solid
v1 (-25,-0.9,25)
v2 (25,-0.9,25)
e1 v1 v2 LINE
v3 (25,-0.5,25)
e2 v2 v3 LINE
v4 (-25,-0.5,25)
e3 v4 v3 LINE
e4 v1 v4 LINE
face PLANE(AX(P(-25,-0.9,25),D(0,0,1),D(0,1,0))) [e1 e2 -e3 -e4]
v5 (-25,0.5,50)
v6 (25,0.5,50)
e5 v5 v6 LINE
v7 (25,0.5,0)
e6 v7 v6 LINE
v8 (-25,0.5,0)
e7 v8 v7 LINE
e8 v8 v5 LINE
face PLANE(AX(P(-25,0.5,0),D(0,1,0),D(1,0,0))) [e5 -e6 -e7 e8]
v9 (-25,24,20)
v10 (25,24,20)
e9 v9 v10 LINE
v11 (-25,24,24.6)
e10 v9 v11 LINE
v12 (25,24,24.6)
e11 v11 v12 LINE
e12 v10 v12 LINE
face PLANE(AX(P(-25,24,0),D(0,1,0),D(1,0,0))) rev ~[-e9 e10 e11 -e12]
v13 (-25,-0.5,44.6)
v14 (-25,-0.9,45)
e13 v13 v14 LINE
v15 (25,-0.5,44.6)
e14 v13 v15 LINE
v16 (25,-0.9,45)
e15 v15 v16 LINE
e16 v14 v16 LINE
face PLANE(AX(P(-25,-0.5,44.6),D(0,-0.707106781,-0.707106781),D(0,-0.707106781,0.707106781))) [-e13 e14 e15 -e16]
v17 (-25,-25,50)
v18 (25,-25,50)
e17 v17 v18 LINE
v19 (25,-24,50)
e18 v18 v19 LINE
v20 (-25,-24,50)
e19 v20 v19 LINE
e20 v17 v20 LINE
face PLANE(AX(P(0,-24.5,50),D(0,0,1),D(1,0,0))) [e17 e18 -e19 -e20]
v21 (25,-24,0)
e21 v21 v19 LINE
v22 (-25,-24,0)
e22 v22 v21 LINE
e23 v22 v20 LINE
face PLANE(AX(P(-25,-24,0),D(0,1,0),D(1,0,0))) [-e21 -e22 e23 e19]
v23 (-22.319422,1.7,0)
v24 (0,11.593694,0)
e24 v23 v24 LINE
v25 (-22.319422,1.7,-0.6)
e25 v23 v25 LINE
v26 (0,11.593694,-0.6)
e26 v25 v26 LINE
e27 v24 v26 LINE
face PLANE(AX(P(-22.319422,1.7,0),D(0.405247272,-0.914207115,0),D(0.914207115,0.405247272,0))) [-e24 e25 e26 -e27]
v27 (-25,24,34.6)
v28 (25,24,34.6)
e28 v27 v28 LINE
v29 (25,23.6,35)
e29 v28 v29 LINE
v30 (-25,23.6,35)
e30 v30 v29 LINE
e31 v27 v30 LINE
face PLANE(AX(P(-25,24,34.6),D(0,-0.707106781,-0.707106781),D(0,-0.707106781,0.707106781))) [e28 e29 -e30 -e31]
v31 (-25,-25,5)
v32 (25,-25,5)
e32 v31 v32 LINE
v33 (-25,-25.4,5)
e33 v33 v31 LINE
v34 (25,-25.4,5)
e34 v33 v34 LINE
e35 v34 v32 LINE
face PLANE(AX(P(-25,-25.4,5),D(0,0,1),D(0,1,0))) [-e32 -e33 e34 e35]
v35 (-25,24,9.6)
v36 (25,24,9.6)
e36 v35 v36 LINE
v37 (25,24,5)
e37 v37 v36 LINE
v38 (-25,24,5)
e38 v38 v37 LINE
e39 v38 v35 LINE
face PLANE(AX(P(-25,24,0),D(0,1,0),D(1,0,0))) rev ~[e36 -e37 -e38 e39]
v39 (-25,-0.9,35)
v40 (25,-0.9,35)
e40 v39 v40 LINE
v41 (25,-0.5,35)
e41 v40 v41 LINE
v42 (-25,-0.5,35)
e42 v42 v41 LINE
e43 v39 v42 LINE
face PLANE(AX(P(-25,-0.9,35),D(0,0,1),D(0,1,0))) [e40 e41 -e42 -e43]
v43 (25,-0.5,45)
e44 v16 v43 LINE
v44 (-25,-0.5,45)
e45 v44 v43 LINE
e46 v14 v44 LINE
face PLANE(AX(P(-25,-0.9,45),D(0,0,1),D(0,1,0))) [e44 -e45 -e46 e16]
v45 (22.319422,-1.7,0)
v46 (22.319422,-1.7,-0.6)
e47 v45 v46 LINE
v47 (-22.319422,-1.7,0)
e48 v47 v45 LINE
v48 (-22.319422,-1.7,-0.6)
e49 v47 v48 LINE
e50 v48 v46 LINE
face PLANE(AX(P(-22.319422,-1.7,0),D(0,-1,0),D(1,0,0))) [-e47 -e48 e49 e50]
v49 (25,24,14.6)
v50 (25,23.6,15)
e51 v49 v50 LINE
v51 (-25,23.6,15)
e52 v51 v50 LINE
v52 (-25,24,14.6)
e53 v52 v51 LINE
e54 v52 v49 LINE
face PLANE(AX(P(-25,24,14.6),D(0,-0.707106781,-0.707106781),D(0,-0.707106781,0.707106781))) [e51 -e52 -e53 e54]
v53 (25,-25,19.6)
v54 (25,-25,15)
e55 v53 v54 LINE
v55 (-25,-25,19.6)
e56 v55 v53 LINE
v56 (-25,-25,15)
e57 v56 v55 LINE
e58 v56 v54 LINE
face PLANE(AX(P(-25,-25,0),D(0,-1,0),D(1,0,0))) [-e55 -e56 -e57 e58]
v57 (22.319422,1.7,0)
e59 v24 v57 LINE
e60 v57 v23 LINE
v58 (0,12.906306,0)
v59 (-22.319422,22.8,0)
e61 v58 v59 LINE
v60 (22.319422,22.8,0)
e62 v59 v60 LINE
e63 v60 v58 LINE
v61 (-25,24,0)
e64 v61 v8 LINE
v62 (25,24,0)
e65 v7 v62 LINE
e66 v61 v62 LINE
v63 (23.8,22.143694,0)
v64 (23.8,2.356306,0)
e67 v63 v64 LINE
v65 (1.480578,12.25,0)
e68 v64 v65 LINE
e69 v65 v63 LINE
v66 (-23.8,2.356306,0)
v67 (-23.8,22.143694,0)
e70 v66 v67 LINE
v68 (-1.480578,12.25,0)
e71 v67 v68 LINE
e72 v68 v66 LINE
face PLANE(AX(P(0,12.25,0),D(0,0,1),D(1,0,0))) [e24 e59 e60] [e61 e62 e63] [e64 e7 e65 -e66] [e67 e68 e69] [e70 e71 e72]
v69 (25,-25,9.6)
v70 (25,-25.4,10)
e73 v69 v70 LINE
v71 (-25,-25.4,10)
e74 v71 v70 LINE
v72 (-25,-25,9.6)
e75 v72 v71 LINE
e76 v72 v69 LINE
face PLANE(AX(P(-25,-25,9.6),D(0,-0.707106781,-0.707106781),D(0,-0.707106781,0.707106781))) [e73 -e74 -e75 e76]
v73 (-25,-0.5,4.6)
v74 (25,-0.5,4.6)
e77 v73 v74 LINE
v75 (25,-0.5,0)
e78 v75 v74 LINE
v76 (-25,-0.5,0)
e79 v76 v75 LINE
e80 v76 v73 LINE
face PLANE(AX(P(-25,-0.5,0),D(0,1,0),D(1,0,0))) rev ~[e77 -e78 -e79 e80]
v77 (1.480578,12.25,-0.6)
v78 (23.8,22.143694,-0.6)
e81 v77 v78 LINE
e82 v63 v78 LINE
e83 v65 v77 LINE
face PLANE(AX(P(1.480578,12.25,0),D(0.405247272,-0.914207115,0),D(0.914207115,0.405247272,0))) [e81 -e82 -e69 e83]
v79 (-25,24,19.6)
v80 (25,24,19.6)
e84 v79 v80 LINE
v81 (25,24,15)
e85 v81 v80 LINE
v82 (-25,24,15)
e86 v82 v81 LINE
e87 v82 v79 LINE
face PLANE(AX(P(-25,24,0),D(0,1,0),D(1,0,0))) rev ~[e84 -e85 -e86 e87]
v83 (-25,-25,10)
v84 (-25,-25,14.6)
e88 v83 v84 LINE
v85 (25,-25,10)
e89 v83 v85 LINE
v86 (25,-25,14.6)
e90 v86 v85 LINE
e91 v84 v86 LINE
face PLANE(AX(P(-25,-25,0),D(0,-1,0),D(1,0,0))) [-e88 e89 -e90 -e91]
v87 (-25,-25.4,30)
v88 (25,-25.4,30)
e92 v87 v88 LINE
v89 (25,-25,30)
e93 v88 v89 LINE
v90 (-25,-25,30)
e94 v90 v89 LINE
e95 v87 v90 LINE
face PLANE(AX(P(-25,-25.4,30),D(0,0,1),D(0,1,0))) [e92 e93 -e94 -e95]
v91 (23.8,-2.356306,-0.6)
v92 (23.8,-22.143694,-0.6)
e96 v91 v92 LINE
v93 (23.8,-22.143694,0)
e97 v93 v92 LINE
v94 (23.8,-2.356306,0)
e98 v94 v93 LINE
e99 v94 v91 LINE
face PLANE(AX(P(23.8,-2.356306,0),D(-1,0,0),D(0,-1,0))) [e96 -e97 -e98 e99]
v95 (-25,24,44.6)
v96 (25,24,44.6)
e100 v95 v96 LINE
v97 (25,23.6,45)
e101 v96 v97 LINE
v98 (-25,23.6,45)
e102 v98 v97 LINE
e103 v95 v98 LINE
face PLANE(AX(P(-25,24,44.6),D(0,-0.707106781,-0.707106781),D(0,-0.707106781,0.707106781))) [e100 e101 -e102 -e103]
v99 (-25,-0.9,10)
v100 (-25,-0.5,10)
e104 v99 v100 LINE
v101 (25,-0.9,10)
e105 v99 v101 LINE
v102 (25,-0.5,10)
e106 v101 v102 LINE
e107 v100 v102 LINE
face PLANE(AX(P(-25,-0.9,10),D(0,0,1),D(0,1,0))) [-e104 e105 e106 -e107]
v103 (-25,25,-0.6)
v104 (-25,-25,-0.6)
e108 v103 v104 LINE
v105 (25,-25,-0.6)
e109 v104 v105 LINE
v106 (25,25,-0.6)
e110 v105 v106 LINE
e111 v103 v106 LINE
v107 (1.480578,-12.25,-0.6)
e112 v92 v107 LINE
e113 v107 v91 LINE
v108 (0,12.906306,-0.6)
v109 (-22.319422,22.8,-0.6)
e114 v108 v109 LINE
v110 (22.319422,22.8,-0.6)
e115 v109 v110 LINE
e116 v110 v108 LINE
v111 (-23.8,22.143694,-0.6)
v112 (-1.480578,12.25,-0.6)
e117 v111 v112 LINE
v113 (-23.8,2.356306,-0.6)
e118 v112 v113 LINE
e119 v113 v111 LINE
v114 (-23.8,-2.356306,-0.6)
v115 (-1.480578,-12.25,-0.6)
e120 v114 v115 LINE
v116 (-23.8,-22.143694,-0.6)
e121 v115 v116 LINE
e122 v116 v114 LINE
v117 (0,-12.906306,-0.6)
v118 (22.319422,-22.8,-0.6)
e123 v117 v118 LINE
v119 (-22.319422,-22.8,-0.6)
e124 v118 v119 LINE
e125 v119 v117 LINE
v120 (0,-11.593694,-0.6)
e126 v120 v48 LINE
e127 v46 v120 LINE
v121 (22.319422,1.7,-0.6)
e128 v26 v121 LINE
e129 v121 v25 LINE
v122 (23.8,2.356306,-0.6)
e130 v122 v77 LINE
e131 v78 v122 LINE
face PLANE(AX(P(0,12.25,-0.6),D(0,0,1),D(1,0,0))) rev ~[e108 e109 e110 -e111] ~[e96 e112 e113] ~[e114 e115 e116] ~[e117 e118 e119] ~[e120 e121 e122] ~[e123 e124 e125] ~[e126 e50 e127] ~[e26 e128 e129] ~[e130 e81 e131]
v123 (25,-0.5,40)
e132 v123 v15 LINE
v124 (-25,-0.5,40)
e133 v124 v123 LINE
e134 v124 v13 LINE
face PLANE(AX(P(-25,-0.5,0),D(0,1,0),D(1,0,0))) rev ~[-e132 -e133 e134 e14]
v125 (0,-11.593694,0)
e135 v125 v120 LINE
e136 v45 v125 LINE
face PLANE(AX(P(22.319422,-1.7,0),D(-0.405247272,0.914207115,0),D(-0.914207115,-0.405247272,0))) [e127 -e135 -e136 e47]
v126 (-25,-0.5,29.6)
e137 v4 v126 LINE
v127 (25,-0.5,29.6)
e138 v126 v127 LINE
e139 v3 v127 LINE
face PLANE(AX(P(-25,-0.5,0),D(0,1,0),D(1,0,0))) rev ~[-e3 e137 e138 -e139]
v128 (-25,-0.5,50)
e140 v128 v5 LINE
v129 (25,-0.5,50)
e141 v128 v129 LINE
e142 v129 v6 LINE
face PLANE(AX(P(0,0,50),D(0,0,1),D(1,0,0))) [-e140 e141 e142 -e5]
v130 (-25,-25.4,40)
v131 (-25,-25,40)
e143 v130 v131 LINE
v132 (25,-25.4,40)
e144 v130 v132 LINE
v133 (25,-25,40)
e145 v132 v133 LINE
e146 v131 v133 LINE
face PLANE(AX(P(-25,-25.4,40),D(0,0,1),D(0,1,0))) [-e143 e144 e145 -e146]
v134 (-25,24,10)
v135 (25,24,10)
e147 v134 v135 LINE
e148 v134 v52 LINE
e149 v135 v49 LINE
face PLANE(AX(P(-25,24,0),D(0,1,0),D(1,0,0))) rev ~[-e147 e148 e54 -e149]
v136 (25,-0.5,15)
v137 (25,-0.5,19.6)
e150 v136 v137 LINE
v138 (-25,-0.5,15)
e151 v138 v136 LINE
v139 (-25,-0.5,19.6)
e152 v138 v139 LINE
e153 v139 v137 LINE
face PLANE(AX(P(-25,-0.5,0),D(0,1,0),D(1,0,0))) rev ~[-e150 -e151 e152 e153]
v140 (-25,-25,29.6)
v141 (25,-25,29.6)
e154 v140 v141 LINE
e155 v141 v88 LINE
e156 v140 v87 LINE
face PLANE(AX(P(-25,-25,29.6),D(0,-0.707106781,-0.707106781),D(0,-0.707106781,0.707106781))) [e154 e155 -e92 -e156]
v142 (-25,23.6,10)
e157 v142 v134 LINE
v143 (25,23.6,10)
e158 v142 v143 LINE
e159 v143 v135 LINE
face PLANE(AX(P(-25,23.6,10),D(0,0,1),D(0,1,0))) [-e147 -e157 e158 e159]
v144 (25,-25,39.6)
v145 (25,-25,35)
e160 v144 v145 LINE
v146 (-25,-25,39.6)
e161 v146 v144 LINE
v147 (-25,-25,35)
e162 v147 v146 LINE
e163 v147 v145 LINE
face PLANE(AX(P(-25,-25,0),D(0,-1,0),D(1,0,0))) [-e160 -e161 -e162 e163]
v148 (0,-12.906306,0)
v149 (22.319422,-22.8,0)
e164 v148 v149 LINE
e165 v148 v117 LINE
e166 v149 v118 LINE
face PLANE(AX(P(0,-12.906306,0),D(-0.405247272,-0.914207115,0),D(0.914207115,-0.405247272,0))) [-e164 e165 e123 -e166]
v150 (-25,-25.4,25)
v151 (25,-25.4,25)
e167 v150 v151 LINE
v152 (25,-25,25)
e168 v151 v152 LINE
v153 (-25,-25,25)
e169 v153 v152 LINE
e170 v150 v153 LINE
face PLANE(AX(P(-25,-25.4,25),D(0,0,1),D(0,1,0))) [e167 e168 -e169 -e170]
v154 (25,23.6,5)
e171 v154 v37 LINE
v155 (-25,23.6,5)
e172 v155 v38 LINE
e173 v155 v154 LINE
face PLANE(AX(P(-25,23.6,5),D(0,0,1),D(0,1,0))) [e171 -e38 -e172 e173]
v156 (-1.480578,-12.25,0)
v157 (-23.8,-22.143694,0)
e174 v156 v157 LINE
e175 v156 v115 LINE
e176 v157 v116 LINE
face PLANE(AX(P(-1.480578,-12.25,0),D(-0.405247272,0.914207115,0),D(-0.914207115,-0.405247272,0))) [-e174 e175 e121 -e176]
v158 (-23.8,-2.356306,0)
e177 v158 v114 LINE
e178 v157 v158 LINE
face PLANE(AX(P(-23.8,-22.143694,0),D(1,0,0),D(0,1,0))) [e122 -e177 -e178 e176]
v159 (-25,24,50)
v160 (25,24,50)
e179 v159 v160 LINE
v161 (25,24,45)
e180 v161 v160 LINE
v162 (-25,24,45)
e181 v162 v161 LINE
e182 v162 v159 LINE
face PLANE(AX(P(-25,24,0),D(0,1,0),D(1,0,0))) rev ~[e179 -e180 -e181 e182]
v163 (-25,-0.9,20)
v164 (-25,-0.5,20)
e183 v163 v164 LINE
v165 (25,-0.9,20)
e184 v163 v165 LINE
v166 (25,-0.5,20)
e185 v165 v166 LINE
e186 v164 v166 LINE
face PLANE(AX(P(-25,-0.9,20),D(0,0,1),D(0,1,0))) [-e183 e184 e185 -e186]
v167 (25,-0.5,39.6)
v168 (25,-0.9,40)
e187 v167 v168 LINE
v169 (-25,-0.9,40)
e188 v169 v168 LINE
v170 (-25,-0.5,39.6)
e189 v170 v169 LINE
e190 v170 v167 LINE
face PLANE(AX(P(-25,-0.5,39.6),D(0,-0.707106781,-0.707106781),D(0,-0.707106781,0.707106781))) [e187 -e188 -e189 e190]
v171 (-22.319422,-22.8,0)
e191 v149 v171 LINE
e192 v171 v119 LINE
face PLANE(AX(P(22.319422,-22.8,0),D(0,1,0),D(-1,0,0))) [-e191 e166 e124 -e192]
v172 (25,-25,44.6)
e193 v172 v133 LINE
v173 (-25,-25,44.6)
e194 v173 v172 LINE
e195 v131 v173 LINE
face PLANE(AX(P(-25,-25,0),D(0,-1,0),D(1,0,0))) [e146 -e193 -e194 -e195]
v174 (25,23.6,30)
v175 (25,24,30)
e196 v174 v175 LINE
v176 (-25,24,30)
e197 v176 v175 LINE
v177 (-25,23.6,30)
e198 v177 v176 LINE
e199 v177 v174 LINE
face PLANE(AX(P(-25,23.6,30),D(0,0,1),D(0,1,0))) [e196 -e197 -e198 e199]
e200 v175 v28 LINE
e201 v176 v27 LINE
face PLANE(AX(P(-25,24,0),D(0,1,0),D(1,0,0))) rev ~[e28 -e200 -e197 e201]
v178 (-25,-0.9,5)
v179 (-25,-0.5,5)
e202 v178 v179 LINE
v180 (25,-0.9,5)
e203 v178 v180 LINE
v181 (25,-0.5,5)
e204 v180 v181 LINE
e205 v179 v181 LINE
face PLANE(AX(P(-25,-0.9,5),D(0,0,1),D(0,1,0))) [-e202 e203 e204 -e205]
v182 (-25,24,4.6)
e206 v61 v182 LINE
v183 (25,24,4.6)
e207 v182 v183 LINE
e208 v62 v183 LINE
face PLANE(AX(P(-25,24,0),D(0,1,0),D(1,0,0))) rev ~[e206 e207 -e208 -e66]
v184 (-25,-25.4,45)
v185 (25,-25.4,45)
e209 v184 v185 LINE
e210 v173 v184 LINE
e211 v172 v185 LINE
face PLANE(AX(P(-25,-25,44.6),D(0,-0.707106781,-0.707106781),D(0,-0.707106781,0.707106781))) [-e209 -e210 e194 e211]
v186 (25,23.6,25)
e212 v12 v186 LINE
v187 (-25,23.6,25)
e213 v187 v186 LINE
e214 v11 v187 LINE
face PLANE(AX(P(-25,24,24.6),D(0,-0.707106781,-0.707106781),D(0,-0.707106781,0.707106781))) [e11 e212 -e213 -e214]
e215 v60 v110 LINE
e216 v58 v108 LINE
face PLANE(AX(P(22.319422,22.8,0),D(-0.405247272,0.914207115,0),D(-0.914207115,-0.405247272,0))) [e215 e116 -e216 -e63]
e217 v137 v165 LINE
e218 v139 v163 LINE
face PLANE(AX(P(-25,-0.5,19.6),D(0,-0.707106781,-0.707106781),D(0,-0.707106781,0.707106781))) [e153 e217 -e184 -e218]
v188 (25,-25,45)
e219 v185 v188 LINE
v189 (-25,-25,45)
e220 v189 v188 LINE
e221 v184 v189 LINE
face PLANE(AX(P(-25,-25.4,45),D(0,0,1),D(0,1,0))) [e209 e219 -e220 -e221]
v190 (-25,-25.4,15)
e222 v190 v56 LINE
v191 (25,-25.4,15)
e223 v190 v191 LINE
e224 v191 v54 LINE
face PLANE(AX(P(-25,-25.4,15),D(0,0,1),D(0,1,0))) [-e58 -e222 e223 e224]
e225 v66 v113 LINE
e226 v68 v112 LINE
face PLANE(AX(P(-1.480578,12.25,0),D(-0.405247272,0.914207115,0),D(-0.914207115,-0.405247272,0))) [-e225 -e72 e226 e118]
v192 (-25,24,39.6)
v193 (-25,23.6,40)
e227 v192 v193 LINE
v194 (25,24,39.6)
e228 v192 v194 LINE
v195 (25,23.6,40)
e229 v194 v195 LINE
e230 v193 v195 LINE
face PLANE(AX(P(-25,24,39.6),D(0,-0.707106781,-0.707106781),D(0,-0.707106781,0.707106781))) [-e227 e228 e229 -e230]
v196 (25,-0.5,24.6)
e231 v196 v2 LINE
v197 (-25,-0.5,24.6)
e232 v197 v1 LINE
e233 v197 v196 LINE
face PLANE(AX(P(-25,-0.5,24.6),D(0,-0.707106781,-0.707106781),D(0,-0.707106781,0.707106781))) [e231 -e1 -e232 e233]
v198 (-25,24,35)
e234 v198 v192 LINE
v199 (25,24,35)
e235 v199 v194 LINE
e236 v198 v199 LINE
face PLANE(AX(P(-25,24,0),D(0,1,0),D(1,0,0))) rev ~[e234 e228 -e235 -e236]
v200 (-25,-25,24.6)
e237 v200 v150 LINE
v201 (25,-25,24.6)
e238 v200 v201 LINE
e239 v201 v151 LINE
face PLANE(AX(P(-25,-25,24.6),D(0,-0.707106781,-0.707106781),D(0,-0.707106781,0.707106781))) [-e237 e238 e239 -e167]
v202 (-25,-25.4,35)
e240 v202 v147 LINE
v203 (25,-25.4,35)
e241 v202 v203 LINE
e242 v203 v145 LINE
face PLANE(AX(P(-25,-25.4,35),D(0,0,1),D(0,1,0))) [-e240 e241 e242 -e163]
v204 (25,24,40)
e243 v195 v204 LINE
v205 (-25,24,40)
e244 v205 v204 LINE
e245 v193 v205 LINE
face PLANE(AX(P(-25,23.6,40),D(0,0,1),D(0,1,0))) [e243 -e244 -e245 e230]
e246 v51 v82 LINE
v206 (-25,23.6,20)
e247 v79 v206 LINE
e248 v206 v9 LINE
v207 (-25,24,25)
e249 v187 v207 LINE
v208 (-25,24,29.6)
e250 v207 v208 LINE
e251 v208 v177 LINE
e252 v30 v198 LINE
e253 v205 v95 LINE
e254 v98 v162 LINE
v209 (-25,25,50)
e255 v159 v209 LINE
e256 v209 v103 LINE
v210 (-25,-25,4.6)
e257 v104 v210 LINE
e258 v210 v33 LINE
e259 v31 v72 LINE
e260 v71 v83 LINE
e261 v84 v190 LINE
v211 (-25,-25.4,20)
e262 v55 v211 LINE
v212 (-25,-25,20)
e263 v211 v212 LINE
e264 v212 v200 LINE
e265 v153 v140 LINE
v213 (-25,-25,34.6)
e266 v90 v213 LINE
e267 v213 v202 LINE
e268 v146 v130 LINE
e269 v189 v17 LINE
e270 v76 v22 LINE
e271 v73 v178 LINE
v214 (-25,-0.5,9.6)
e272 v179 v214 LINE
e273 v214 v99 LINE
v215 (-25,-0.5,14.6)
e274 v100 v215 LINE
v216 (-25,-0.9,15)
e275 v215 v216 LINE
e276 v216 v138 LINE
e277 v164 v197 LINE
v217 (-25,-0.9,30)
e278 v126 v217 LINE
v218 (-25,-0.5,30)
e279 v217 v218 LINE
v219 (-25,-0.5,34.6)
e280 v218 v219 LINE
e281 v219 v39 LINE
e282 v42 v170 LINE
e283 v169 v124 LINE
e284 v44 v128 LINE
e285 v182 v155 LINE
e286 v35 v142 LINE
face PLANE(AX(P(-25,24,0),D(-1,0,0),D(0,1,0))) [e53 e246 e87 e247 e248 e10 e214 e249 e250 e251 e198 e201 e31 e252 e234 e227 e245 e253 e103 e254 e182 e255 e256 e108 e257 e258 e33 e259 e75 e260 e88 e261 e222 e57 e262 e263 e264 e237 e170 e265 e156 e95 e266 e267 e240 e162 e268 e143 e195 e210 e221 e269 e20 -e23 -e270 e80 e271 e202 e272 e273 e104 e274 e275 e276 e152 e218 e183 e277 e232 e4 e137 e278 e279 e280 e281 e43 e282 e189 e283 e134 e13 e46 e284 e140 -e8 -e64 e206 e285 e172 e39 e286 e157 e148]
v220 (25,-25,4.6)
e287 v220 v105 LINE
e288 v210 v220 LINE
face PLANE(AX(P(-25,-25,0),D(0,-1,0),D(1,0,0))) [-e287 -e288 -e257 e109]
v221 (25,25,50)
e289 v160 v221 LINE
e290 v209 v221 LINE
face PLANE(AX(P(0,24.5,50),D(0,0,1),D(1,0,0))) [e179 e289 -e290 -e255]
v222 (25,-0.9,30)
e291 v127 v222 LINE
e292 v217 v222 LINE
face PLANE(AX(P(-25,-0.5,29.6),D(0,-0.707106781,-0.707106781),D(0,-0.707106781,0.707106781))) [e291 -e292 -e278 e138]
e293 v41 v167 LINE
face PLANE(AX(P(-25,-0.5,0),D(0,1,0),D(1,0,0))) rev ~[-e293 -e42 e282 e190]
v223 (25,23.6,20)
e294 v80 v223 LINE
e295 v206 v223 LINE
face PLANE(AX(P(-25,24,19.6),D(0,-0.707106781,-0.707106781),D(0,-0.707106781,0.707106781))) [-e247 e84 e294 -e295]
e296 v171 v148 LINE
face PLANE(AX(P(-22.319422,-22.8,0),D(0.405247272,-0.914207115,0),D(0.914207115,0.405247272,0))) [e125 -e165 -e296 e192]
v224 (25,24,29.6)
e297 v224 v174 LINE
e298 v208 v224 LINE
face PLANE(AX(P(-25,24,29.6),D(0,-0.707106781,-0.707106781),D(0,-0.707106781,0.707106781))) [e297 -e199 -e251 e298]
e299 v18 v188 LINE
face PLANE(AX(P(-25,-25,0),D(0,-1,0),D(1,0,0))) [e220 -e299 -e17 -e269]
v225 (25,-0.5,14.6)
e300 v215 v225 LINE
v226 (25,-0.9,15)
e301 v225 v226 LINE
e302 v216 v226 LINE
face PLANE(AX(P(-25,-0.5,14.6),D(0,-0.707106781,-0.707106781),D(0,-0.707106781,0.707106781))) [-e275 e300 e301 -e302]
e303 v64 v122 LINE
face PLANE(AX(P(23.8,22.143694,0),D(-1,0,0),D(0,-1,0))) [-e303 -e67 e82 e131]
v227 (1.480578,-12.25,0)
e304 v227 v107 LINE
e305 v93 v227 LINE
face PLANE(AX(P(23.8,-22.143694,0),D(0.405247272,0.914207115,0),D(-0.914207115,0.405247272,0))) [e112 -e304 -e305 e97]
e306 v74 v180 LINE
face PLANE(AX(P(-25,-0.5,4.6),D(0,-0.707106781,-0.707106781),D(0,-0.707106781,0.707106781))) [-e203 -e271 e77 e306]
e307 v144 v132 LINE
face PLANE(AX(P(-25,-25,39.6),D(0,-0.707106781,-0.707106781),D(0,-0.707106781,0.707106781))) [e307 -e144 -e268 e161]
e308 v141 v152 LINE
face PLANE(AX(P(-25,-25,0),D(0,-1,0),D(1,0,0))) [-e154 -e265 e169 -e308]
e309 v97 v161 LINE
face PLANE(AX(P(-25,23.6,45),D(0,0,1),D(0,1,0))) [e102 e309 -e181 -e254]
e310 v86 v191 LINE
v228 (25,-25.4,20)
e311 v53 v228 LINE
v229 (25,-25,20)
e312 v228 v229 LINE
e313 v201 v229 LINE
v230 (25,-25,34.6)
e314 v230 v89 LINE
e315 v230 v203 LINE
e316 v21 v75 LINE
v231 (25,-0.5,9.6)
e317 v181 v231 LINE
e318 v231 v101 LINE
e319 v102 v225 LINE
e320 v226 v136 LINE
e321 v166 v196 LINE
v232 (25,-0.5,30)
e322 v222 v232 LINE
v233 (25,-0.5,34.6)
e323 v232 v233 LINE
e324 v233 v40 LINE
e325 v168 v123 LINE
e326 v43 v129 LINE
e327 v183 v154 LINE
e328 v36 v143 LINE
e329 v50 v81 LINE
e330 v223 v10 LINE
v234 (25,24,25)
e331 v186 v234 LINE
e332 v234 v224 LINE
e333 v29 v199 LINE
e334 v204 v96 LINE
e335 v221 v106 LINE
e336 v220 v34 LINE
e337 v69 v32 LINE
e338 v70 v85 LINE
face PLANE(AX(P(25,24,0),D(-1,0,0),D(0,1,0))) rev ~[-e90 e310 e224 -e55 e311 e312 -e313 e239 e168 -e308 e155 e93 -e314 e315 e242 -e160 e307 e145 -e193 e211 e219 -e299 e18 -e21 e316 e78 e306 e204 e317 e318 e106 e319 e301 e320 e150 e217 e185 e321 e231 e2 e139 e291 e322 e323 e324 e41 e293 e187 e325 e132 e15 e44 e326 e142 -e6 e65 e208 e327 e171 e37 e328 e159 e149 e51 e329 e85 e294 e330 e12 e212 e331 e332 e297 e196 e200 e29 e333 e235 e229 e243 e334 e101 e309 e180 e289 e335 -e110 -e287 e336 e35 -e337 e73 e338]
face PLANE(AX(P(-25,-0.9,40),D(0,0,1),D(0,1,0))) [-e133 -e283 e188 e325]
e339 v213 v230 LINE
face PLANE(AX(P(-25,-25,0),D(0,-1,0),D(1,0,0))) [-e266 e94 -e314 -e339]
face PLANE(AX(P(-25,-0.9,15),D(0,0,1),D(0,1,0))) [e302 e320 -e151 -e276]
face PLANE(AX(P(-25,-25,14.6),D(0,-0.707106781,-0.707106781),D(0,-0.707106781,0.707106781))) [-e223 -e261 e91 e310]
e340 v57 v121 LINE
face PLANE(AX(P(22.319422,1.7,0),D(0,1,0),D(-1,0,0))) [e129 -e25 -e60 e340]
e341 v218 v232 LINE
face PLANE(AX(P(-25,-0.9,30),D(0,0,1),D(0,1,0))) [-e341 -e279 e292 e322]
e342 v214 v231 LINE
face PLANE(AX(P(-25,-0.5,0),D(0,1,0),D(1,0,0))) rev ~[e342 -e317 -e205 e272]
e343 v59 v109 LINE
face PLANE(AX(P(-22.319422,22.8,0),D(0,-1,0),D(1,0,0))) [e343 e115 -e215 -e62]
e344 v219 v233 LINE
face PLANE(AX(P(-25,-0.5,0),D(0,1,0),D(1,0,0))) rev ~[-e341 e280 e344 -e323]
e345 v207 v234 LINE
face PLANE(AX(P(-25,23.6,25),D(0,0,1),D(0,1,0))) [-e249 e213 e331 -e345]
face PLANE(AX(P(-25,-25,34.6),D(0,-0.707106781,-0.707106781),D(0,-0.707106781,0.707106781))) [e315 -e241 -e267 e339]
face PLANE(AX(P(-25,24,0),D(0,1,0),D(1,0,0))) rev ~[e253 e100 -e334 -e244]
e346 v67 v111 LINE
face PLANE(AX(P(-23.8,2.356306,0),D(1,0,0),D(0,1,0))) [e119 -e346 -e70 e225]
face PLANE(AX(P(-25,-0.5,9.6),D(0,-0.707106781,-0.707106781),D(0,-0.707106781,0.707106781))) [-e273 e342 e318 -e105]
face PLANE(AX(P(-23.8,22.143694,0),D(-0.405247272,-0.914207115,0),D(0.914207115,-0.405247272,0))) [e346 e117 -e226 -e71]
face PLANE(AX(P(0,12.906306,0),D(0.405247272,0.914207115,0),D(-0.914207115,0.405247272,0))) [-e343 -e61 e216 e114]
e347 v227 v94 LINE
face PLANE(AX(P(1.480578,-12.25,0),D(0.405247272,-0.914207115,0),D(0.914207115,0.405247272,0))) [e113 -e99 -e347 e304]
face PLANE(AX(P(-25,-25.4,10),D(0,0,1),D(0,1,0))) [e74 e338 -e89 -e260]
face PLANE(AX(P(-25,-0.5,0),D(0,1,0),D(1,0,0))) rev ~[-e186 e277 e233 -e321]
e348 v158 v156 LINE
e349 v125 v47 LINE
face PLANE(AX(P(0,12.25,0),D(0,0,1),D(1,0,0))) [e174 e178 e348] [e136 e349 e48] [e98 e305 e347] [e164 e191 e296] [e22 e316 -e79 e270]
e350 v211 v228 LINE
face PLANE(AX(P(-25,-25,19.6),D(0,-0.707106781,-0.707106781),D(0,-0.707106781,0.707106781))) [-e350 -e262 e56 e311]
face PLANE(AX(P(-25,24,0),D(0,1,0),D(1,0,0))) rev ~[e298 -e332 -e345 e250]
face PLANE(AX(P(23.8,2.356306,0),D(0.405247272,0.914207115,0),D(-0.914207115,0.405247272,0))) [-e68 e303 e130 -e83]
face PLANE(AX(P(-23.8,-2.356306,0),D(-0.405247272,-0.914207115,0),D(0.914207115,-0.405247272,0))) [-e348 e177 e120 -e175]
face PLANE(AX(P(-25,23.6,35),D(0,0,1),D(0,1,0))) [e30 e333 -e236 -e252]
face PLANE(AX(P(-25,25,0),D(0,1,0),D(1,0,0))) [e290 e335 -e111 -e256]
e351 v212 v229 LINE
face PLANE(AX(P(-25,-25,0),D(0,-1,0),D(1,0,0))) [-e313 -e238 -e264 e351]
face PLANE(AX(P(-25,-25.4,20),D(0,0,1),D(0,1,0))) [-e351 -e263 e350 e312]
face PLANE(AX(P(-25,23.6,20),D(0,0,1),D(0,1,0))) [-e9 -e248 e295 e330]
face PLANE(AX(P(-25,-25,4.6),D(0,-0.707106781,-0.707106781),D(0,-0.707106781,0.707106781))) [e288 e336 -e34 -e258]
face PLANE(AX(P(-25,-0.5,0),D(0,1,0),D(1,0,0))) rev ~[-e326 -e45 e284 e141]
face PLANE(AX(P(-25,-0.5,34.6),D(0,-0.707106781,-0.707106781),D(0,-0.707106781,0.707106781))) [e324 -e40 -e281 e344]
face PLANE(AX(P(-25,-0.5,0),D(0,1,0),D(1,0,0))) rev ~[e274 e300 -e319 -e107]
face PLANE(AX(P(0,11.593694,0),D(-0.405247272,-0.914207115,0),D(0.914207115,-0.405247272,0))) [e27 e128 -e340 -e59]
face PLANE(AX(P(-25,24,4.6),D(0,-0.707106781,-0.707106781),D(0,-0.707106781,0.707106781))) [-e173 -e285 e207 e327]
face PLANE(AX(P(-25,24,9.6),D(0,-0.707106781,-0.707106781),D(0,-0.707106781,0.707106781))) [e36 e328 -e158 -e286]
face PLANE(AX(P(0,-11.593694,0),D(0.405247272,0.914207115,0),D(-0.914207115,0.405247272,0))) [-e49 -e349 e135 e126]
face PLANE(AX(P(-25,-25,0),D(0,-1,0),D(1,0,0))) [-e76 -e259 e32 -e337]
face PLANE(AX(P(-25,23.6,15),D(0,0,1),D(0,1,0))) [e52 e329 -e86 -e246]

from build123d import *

# Parameters (mm, degrees)
F0_W     = 50
F0_H     = 23.5
F0_H_2   = 1
F1_DEPTH = 0.6
F2_DEPTH = 50
F4_DEPTH = 50


# Not quite as in the source:
# - a feature names something its author has since deleted; it is built from what else it names


with BuildPart() as f1:
    # F0 (on Top) → F1 (new body)
    with BuildSketch(Plane.XY):
        with Locations((0, 12.25)):
            Rectangle(F0_W, F0_H)
        Polygon((-23.8, 22.1436935786), (-23.8, 22.8), (-22.3194224806, 22.8), (22.3194224806, 22.8), (23.8, 22.8), (23.8, 22.1436935786), (23.8, 2.3563064214), (23.8, 1.7), (22.3194224806, 1.7), (-22.3194224806, 1.7), (-23.8, 1.7), (-23.8, 2.3563064214), align=None, mode=Mode.SUBTRACT)
        with Locations((0, -12.25)):
            Rectangle(F0_W, F0_H)
        Polygon((-22.3194224806, -22.8), (-23.8, -22.8), (-23.8, -22.1436935786), (-23.8, -2.3563064214), (-23.8, -1.7), (-22.3194224806, -1.7), (22.3194224806, -1.7), (23.8, -1.7), (23.8, -2.3563064214), (23.8, -22.1436935786), (23.8, -22.8), (22.3194224806, -22.8), align=None, mode=Mode.SUBTRACT)
        with Locations((0, -24.5)):
            Rectangle(F0_W, F0_H_2)
        Rectangle(F0_W, F0_H_2)
        with Locations((0, 24.5)):
            Rectangle(F0_W, F0_H_2)
        Polygon((-22.3194224806, 22.8), (-23.8, 22.8), (-23.8, 22.1436935786), (-1.4805775194, 12.25), (0, 12.9063064214), align=None)
        Polygon((23.8, 22.8), (22.3194224806, 22.8), (0, 12.9063064214), (1.4805775194, 12.25), (23.8, 22.1436935786), align=None)
        Polygon((1.4805775194, 12.25), (0, 12.9063064214), (-1.4805775194, 12.25), (0, 11.5936935786), align=None)
        Polygon((23.8, 2.3563064214), (1.4805775194, 12.25), (0, 11.5936935786), (22.3194224806, 1.7), (23.8, 1.7), align=None)
        Polygon((-1.4805775194, 12.25), (-23.8, 2.3563064214), (-23.8, 1.7), (-22.3194224806, 1.7), (0, 11.5936935786), align=None)
        Polygon((-23.8, -1.7), (-23.8, -2.3563064214), (-1.4805775194, -12.25), (0, -11.5936935786), (-22.3194224806, -1.7), align=None)
        Polygon((0, -11.5936935786), (-1.4805775194, -12.25), (0, -12.9063064214), (1.4805775194, -12.25), align=None)
        Polygon((22.3194224806, -1.7), (0, -11.5936935786), (1.4805775194, -12.25), (23.8, -2.3563064214), (23.8, -1.7), align=None)
        Polygon((0, -12.9063064214), (22.3194224806, -22.8), (23.8, -22.8), (23.8, -22.1436935786), (1.4805775194, -12.25), align=None)
        Polygon((-23.8, -22.1436935786), (-23.8, -22.8), (-22.3194224806, -22.8), (0, -12.9063064214), (-1.4805775194, -12.25), align=None)
    extrude(amount=-F1_DEPTH)

    # F0 (on Top) → F2 (join)
    with BuildSketch(Plane.XY):
        with Locations((0, 24.5)):
            Rectangle(F0_W, F0_H_2)
        Rectangle(F0_W, F0_H_2)
        with Locations((0, -24.5)):
            Rectangle(F0_W, F0_H_2)
    extrude(amount=F2_DEPTH)

    # F3 (on face) → F4 (join, through all)
    with BuildSketch(Plane(origin=(-25, 0, 0), x_dir=(0, -1, 0), z_dir=(-1, 0, 0))):
        Polygon((-24, 45), (-24, 44.6), (-23.6, 45), align=None)
        Polygon((-24, 40), (-24, 39.6), (-23.6, 40), align=None)
        Polygon((-24, 35), (-24, 34.6), (-23.6, 35), align=None)
        Polygon((-24, 30), (-24, 29.6), (-23.6, 30), align=None)
        Polygon((-24, 25), (-24, 24.6), (-23.6, 25), align=None)
        Polygon((-24, 20), (-24, 19.6), (-23.6, 20), align=None)
        Polygon((-24, 15), (-24, 14.6), (-23.6, 15), align=None)
        Polygon((-24, 10), (-24, 9.6), (-23.6, 10), align=None)
        Polygon((-24, 5), (-24, 4.6), (-23.6, 5), align=None)
        Polygon((0.9, 5), (0.5, 5), (0.5, 4.6), align=None)
        Polygon((0.9, 10), (0.5, 10), (0.5, 9.6), align=None)
        Polygon((0.9, 15), (0.5, 15), (0.5, 14.6), align=None)
        Polygon((0.9, 20), (0.5, 20), (0.5, 19.6), align=None)
        Polygon((0.9, 25), (0.5, 25), (0.5, 24.6), align=None)
        Polygon((0.9, 30), (0.5, 30), (0.5, 29.6), align=None)
        Polygon((0.9, 35), (0.5, 35), (0.5, 34.6), align=None)
        Polygon((0.9, 40), (0.5, 40), (0.5, 39.6), align=None)
        Polygon((0.9, 45), (0.5, 45), (0.5, 44.6), align=None)
        Polygon((25.4, 45), (25, 45), (25, 44.6), align=None)
        Polygon((25.4, 40), (25, 40), (25, 39.6), align=None)
        Polygon((25.4, 35), (25, 35), (25, 34.6), align=None)
        Polygon((25, 30), (25, 29.6), (25.4, 30), align=None)
        Polygon((25, 25), (25, 24.6), (25.4, 25), align=None)
        Polygon((25, 20), (25, 19.6), (25.4, 20), align=None)
        Polygon((25, 15), (25, 14.6), (25.4, 15), align=None)
        Polygon((25, 10), (25, 9.6), (25.4, 10), align=None)
        Polygon((25, 5), (25, 4.6), (25.4, 5), align=None)
    extrude(amount=-F4_DEPTH)


solid = f1.part
